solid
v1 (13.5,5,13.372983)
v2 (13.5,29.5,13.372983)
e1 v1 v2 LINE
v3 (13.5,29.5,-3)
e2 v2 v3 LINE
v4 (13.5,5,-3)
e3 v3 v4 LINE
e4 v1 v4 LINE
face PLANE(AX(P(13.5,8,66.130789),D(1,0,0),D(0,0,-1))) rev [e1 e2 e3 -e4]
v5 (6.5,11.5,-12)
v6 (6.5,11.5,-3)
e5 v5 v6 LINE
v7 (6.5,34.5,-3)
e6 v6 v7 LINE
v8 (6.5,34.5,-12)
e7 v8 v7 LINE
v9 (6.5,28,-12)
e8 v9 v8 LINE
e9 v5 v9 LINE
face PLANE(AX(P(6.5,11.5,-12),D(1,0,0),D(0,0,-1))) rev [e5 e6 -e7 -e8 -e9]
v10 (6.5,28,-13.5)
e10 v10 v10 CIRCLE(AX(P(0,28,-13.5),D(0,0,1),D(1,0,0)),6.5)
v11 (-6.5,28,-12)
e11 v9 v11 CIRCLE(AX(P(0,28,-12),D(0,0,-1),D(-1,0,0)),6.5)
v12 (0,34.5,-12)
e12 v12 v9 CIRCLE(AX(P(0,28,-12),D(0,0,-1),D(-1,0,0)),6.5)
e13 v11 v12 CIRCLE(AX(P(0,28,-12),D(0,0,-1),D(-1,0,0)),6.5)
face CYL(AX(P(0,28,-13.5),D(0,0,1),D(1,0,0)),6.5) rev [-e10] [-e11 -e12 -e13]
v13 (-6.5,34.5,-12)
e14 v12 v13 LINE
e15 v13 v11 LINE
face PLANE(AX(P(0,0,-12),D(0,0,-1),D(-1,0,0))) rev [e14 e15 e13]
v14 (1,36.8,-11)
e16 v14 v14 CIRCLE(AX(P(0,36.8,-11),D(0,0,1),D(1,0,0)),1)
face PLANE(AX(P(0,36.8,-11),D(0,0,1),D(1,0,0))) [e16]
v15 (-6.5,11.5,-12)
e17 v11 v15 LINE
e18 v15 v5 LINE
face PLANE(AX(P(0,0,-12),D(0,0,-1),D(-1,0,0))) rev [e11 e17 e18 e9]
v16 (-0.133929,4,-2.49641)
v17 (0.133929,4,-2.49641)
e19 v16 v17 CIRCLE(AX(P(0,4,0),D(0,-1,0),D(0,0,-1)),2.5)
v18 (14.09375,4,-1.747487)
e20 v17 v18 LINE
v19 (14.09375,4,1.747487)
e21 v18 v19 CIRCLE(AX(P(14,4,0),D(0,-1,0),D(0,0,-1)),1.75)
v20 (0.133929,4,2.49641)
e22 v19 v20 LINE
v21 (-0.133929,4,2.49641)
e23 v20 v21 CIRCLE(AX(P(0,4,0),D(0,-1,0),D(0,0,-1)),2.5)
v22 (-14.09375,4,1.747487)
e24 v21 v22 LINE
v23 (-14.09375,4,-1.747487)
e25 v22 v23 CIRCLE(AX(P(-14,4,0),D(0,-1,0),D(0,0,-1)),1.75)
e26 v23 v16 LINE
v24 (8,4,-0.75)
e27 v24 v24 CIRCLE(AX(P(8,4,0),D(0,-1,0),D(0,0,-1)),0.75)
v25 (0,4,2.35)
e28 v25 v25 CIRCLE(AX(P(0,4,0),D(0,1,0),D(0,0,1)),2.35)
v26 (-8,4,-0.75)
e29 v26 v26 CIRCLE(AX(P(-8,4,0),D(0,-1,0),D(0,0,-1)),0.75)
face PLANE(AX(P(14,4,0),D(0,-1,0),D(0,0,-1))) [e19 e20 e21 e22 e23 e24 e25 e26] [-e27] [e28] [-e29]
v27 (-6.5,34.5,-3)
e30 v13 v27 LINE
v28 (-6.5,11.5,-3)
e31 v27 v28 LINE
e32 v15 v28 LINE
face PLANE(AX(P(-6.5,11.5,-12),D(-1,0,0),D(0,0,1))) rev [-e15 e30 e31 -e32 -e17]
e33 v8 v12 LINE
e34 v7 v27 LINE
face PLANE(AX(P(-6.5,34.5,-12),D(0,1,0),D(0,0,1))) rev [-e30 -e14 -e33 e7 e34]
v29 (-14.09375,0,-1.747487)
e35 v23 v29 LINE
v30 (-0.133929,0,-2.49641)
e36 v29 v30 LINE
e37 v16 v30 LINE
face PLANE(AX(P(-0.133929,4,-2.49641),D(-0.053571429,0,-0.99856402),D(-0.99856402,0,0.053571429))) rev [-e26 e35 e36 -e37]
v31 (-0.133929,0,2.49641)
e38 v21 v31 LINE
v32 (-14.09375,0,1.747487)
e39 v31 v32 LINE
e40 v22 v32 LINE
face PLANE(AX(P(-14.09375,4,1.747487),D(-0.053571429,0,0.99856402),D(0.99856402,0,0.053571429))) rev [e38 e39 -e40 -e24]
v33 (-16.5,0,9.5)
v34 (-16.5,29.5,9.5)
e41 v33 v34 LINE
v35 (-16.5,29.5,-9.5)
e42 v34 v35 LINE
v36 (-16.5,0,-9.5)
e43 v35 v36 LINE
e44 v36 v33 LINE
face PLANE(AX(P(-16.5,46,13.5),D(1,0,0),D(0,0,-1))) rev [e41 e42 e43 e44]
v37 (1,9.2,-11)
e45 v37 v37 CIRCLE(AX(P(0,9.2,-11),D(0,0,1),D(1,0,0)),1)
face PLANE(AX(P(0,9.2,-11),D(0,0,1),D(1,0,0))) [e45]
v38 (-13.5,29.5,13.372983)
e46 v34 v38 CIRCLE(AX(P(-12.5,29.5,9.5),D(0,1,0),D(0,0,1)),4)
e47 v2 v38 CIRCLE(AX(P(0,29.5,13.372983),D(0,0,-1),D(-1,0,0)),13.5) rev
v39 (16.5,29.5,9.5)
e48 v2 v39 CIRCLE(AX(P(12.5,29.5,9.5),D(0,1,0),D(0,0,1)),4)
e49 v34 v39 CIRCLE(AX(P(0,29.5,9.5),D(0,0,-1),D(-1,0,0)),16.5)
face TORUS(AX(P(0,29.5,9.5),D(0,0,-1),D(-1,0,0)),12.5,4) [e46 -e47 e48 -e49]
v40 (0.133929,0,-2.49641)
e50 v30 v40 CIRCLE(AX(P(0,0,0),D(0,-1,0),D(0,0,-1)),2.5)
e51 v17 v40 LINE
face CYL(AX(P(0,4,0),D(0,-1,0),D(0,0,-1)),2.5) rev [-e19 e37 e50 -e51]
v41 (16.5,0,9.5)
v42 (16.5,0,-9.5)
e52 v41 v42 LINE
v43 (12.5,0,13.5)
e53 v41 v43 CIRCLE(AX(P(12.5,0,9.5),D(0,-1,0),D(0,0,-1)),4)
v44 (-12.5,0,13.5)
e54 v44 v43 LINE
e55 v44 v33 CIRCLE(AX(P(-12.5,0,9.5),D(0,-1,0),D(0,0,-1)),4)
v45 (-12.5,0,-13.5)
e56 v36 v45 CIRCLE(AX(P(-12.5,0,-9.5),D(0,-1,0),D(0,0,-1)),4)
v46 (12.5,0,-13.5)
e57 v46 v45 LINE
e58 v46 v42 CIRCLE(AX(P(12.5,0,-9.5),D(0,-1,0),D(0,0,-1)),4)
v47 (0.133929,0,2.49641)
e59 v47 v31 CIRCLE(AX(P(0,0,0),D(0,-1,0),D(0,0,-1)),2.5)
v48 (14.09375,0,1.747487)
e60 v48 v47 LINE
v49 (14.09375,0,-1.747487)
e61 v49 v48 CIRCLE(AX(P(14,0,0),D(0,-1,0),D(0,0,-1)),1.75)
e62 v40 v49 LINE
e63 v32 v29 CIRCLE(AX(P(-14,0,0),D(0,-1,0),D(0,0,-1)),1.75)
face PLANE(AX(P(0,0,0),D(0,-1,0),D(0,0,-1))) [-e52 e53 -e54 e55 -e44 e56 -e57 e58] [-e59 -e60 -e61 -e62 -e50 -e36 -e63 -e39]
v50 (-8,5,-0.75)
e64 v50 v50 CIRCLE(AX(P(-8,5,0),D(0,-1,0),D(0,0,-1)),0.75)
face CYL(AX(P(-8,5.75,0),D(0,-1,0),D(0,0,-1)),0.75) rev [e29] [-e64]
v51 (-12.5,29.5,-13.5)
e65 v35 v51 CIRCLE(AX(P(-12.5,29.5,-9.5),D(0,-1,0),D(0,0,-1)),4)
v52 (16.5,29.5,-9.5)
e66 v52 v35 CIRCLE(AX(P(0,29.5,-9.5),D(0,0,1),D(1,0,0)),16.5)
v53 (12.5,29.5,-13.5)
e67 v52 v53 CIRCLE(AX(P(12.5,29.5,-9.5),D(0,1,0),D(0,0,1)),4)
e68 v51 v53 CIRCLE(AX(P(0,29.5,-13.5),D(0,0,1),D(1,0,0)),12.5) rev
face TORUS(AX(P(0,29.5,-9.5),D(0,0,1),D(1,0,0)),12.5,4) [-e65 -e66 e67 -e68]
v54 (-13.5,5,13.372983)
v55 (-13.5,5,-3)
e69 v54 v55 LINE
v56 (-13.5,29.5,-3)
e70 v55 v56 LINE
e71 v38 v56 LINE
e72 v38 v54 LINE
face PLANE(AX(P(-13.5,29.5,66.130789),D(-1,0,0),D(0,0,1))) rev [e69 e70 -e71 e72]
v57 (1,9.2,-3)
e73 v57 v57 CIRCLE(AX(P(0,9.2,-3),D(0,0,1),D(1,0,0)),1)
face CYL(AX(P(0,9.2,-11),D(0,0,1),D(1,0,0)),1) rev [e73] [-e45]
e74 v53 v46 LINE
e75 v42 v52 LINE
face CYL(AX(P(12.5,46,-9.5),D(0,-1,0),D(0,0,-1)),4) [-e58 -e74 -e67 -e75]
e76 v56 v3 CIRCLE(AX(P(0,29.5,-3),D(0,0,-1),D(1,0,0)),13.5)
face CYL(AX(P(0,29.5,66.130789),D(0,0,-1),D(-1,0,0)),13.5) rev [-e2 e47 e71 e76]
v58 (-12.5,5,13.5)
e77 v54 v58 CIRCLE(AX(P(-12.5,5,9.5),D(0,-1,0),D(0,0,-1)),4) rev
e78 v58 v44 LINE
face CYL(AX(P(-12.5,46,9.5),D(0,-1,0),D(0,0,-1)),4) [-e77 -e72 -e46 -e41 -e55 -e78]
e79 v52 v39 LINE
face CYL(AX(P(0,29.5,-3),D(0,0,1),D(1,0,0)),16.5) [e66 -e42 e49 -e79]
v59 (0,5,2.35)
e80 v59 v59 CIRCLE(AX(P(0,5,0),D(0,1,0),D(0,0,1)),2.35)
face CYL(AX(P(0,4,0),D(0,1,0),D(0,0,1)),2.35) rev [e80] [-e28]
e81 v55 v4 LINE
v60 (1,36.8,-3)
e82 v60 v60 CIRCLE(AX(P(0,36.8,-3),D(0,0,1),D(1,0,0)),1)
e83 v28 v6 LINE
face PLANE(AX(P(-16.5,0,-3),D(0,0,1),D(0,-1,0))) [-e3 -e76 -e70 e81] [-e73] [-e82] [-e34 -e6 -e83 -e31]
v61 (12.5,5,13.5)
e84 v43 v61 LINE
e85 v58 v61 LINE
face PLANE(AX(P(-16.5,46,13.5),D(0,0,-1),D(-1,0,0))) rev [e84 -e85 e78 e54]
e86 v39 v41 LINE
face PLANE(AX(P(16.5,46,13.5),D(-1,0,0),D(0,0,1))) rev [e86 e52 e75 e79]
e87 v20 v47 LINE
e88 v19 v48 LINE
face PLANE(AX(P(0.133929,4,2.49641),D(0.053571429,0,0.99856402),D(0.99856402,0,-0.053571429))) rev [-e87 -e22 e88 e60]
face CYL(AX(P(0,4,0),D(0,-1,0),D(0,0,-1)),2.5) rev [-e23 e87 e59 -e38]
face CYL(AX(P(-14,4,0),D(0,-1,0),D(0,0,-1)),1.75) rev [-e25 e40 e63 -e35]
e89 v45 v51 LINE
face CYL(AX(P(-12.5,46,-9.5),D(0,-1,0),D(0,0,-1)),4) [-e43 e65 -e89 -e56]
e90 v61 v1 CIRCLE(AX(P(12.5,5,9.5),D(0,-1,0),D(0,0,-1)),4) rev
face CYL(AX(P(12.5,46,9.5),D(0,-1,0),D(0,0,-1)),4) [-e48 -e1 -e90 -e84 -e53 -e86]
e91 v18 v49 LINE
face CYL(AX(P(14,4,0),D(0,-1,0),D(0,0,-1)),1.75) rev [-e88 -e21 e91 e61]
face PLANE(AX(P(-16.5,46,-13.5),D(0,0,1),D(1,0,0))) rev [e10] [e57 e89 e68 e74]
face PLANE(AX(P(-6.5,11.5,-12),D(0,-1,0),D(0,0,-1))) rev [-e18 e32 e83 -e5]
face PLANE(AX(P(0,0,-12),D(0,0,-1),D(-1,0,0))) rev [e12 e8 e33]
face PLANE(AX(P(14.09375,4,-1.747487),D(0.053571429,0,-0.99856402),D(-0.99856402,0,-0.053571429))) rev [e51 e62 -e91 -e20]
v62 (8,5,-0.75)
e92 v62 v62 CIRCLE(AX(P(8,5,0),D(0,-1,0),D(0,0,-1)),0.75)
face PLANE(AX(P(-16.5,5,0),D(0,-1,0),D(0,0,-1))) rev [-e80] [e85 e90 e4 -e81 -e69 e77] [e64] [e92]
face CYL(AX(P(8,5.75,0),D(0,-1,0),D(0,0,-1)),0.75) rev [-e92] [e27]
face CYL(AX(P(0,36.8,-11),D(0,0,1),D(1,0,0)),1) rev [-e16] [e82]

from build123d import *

# Parameters (mm, degrees)
SKETCH1_W               = 33
SKETCH1_H               = 27
BOSS_EXTRUDE1_DEPTH     = 46
SKETCH2_W               = 16.5
SKETCH2_H               = 41
CUT_EXTRUDE1_DEPTH      = 59.200085911
FILLET1_RADIUS          = 16.5
FILLET1_LENGTH          = 10.5
SKETCH3_W               = 13
SKETCH3_H               = 23
CUT_EXTRUDE2_DEPTH      = 9
CUT_EXTRUDE3_DEPTH      = 56.12259065
CUT_EXTRUDE3_DEPTH_BACK = 56.12259065
SKETCH4_R               = 6.5
SKETCH5_R               = 1
CUT_EXTRUDE4_DEPTH      = 8
BOSS_EXTRUDE2_START     = 16.5
BOSS_EXTRUDE2_DEPTH     = 16.5
FILLET2_R               = 4
CUT_EXTRUDE5_DEPTH      = 4
SKETCH8_R               = 1.3
CUT_EXTRUDE6_DEPTH      = 1.75
SKETCH9_R               = 2.35
CUT_EXTRUDE7_DEPTH      = 1
SKETCH10_R              = 0.75
CUT_EXTRUDE8_DEPTH      = 1.75


with BuildPart() as part:
    # Sketch1 → Boss-Extrude1 (new body)
    with BuildSketch(Plane(origin=(0, 0, 0), x_dir=(1, 0, 0), z_dir=(0, 1, 0))):
        Rectangle(SKETCH1_W, SKETCH1_H)
    extrude(amount=BOSS_EXTRUDE1_DEPTH)

    # Sketch2 → Cut-Extrude1 (cut, through all)
    with BuildSketch(Plane(origin=(16.5, 0, 0), x_dir=(0, 0, -1), z_dir=(1, 0, 0))):
        with Locations((-5.25, 25.5)):
            Rectangle(SKETCH2_W, SKETCH2_H)
    extrude(amount=-CUT_EXTRUDE1_DEPTH, mode=Mode.SUBTRACT)

    # Fillet1: full round fillet: the end face becomes a half cylinder, R = half its width
    fillet1_face = Plane((0, 46, -8.25), x_dir=(0, 0, 1), z_dir=(0, 1, 0))  # on the end face: x along it, z out of the body
    fillet1_slab = fillet1_face.offset(-FILLET1_RADIUS / 2) * Box(FILLET1_LENGTH, 2 * FILLET1_RADIUS, FILLET1_RADIUS, mode=Mode.PRIVATE)  # the body's end, R deep
    fillet1_round = Plane((0, 29.5, -8.25), x_dir=(0, 1, 0), z_dir=(0, 0, 1)) * Cylinder(FILLET1_RADIUS, FILLET1_LENGTH, mode=Mode.PRIVATE)  # its axis R under the face
    add(fillet1_slab - fillet1_round, mode=Mode.SUBTRACT)

    # Sketch3 → Cut-Extrude2 (cut)
    with BuildSketch(Plane.XY.offset(-3)):
        with Locations((0, 23)):
            Rectangle(SKETCH3_W, SKETCH3_H)
    extrude(amount=-CUT_EXTRUDE2_DEPTH, mode=Mode.SUBTRACT)

    # Sketch4 → Cut-Extrude3 (cut, two sides: drawn at the far end of the back side and taken through both)
    with BuildSketch(Plane.XY.offset(-12).offset(-CUT_EXTRUDE3_DEPTH_BACK)):
        with Locations((0, 28)):
            Circle(SKETCH4_R)
    extrude(amount=CUT_EXTRUDE3_DEPTH + CUT_EXTRUDE3_DEPTH_BACK, mode=Mode.SUBTRACT)

    # Sketch5 → Cut-Extrude4 (cut)
    with BuildSketch(Plane.XY.offset(-3)):
        with Locations((0, 36.8)):
            Circle(SKETCH5_R)
        with Locations((0, 9.2)):
            Circle(SKETCH5_R)
    extrude(amount=-CUT_EXTRUDE4_DEPTH, mode=Mode.SUBTRACT)

    # Sketch6 → Boss-Extrude2 (add)
    with BuildSketch(Plane.XY.offset(-3).offset(BOSS_EXTRUDE2_START)):
        with BuildLine():
            Line((13.5, 5), (16.5, 5))
            Line((16.5, 5), (16.5, 29.5))
            ThreePointArc((16.5, 29.5), (0, 46), (-16.5, 29.5))
            Line((-16.5, 29.5), (-16.5, 5))
            Line((-16.5, 5), (-13.5, 5))
            Line((-13.5, 5), (-13.5, 8))
            Line((-13.5, 8), (-13.5, 29.5))
            ThreePointArc((-13.5, 29.5), (0, 43), (13.5, 29.5))
            Line((13.5, 29.5), (13.5, 8))
            Line((13.5, 8), (13.5, 5))
        make_face()
    extrude(amount=-BOSS_EXTRUDE2_DEPTH)

    # Fillet2
    # the kernel refuses this fillet: 4 mm, written as the material it takes off along each edge
    with BuildSketch(Plane(origin=(16.5, -10, 13.5), x_dir=(-1, 0, 0), z_dir=(0, 1, 0)), Plane(origin=(-16.5, 29.5, 13.5), x_dir=(1, 0, 0), z_dir=(0, -1, 0)), Plane(origin=(-16.5, -10, -13.5), x_dir=(1, 0, 0), z_dir=(0, 1, 0))) as fillet2_piece_1:
        with BuildLine():
            CenterArc((FILLET2_R, -FILLET2_R), FILLET2_R, 90, 90)
            Line((0, -FILLET2_R), (0, 0))
            Line((0, 0), (FILLET2_R, 0))
        make_face()
    extrude(amount=39.5, mode=Mode.SUBTRACT)
    with BuildSketch(Plane(origin=(16.5, -10, -13.5), x_dir=(-1, 0, 0), z_dir=(0, 1, 0))) as fillet2_piece_2:
        with BuildLine():
            CenterArc((FILLET2_R, FILLET2_R), FILLET2_R, 180, 90)
            Line((0, FILLET2_R), (0, 0))
            Line((0, 0), (FILLET2_R, 0))
        make_face()
    extrude(amount=39.5, mode=Mode.SUBTRACT)
    with BuildSketch(Plane(origin=(0, 29.5, -13.5), x_dir=(-1, 0, 0), z_dir=(0, -1, 0))) as fillet2_piece_3:
        with BuildLine():
            CenterArc((16.5 - FILLET2_R, -FILLET2_R), FILLET2_R, 0, 90)
            Line((16.5, -FILLET2_R), (16.5, 0))
            Line((16.5, 0), (16.5 - FILLET2_R, 0))
        make_face()
    revolve(axis=Axis((0, 29.5, -13.5), (0, 0, -1)), revolution_arc=180, mode=Mode.SUBTRACT)
    with BuildSketch(Plane(origin=(0, 29.5, 13.5), x_dir=(1, 0, 0), z_dir=(0, -1, 0))) as fillet2_piece_4:
        with BuildLine():
            CenterArc((16.5 - FILLET2_R, -FILLET2_R), FILLET2_R, 360, 90)
            Line((16.5, -FILLET2_R), (16.5, 0))
            Line((16.5, 0), (16.5 - FILLET2_R, 0))
        make_face()
    revolve(axis=Axis((0, 29.5, 13.5), (0, 0, 1)), revolution_arc=180, mode=Mode.SUBTRACT)

    # Sketch7 → Cut-Extrude5 (cut)
    with BuildSketch(Plane.XZ):
        with BuildLine():
            Line((-14.09375, 1.747487035), (-0.133928571, 2.49641005))
            ThreePointArc((-0.133928571, 2.49641005), (0, 2.5), (0.133928571, 2.49641005))
            Line((0.133928571, 2.49641005), (14.09375, 1.747487035))
            ThreePointArc((14.09375, 1.747487035), (15.75, 0), (14.09375, -1.747487035))
            Line((14.09375, -1.747487035), (0.133928571, -2.49641005))
            ThreePointArc((0.133928571, -2.49641005), (0, -2.5), (-0.133928571, -2.49641005))
            Line((-0.133928571, -2.49641005), (-14.09375, -1.747487035))
            ThreePointArc((-14.09375, -1.747487035), (-15.75, 0), (-14.09375, 1.747487035))
        make_face()
    extrude(amount=-CUT_EXTRUDE5_DEPTH, mode=Mode.SUBTRACT)

    # Sketch8 → Cut-Extrude6 (cut)
    with BuildSketch(Plane.XZ.offset(-4)):
        with Locations(Location((0, 0, 0), (0, 0, 270))):
            Circle(SKETCH8_R)
    extrude(amount=-CUT_EXTRUDE6_DEPTH, mode=Mode.SUBTRACT)

    # Sketch9 → Cut-Extrude7 (cut)
    with BuildSketch(Plane(origin=(0, 5, 0), x_dir=(1, 0, 0), z_dir=(0, 1, 0))):
        with Locations(Location((0, 0, 0), (0, 0, 270))):
            Circle(SKETCH9_R)
    extrude(amount=-CUT_EXTRUDE7_DEPTH, mode=Mode.SUBTRACT)

    # Sketch10 → Cut-Extrude8 (cut)
    with BuildSketch(Plane.XZ.offset(-4)):
        with Locations(Location((8, 0, 0), (0, 0, 270))):
            Circle(SKETCH10_R)
        with Locations(Location((-8, 0, 0), (0, 0, 270))):
            Circle(SKETCH10_R)
    extrude(amount=-CUT_EXTRUDE8_DEPTH, mode=Mode.SUBTRACT)


solid = part.part
